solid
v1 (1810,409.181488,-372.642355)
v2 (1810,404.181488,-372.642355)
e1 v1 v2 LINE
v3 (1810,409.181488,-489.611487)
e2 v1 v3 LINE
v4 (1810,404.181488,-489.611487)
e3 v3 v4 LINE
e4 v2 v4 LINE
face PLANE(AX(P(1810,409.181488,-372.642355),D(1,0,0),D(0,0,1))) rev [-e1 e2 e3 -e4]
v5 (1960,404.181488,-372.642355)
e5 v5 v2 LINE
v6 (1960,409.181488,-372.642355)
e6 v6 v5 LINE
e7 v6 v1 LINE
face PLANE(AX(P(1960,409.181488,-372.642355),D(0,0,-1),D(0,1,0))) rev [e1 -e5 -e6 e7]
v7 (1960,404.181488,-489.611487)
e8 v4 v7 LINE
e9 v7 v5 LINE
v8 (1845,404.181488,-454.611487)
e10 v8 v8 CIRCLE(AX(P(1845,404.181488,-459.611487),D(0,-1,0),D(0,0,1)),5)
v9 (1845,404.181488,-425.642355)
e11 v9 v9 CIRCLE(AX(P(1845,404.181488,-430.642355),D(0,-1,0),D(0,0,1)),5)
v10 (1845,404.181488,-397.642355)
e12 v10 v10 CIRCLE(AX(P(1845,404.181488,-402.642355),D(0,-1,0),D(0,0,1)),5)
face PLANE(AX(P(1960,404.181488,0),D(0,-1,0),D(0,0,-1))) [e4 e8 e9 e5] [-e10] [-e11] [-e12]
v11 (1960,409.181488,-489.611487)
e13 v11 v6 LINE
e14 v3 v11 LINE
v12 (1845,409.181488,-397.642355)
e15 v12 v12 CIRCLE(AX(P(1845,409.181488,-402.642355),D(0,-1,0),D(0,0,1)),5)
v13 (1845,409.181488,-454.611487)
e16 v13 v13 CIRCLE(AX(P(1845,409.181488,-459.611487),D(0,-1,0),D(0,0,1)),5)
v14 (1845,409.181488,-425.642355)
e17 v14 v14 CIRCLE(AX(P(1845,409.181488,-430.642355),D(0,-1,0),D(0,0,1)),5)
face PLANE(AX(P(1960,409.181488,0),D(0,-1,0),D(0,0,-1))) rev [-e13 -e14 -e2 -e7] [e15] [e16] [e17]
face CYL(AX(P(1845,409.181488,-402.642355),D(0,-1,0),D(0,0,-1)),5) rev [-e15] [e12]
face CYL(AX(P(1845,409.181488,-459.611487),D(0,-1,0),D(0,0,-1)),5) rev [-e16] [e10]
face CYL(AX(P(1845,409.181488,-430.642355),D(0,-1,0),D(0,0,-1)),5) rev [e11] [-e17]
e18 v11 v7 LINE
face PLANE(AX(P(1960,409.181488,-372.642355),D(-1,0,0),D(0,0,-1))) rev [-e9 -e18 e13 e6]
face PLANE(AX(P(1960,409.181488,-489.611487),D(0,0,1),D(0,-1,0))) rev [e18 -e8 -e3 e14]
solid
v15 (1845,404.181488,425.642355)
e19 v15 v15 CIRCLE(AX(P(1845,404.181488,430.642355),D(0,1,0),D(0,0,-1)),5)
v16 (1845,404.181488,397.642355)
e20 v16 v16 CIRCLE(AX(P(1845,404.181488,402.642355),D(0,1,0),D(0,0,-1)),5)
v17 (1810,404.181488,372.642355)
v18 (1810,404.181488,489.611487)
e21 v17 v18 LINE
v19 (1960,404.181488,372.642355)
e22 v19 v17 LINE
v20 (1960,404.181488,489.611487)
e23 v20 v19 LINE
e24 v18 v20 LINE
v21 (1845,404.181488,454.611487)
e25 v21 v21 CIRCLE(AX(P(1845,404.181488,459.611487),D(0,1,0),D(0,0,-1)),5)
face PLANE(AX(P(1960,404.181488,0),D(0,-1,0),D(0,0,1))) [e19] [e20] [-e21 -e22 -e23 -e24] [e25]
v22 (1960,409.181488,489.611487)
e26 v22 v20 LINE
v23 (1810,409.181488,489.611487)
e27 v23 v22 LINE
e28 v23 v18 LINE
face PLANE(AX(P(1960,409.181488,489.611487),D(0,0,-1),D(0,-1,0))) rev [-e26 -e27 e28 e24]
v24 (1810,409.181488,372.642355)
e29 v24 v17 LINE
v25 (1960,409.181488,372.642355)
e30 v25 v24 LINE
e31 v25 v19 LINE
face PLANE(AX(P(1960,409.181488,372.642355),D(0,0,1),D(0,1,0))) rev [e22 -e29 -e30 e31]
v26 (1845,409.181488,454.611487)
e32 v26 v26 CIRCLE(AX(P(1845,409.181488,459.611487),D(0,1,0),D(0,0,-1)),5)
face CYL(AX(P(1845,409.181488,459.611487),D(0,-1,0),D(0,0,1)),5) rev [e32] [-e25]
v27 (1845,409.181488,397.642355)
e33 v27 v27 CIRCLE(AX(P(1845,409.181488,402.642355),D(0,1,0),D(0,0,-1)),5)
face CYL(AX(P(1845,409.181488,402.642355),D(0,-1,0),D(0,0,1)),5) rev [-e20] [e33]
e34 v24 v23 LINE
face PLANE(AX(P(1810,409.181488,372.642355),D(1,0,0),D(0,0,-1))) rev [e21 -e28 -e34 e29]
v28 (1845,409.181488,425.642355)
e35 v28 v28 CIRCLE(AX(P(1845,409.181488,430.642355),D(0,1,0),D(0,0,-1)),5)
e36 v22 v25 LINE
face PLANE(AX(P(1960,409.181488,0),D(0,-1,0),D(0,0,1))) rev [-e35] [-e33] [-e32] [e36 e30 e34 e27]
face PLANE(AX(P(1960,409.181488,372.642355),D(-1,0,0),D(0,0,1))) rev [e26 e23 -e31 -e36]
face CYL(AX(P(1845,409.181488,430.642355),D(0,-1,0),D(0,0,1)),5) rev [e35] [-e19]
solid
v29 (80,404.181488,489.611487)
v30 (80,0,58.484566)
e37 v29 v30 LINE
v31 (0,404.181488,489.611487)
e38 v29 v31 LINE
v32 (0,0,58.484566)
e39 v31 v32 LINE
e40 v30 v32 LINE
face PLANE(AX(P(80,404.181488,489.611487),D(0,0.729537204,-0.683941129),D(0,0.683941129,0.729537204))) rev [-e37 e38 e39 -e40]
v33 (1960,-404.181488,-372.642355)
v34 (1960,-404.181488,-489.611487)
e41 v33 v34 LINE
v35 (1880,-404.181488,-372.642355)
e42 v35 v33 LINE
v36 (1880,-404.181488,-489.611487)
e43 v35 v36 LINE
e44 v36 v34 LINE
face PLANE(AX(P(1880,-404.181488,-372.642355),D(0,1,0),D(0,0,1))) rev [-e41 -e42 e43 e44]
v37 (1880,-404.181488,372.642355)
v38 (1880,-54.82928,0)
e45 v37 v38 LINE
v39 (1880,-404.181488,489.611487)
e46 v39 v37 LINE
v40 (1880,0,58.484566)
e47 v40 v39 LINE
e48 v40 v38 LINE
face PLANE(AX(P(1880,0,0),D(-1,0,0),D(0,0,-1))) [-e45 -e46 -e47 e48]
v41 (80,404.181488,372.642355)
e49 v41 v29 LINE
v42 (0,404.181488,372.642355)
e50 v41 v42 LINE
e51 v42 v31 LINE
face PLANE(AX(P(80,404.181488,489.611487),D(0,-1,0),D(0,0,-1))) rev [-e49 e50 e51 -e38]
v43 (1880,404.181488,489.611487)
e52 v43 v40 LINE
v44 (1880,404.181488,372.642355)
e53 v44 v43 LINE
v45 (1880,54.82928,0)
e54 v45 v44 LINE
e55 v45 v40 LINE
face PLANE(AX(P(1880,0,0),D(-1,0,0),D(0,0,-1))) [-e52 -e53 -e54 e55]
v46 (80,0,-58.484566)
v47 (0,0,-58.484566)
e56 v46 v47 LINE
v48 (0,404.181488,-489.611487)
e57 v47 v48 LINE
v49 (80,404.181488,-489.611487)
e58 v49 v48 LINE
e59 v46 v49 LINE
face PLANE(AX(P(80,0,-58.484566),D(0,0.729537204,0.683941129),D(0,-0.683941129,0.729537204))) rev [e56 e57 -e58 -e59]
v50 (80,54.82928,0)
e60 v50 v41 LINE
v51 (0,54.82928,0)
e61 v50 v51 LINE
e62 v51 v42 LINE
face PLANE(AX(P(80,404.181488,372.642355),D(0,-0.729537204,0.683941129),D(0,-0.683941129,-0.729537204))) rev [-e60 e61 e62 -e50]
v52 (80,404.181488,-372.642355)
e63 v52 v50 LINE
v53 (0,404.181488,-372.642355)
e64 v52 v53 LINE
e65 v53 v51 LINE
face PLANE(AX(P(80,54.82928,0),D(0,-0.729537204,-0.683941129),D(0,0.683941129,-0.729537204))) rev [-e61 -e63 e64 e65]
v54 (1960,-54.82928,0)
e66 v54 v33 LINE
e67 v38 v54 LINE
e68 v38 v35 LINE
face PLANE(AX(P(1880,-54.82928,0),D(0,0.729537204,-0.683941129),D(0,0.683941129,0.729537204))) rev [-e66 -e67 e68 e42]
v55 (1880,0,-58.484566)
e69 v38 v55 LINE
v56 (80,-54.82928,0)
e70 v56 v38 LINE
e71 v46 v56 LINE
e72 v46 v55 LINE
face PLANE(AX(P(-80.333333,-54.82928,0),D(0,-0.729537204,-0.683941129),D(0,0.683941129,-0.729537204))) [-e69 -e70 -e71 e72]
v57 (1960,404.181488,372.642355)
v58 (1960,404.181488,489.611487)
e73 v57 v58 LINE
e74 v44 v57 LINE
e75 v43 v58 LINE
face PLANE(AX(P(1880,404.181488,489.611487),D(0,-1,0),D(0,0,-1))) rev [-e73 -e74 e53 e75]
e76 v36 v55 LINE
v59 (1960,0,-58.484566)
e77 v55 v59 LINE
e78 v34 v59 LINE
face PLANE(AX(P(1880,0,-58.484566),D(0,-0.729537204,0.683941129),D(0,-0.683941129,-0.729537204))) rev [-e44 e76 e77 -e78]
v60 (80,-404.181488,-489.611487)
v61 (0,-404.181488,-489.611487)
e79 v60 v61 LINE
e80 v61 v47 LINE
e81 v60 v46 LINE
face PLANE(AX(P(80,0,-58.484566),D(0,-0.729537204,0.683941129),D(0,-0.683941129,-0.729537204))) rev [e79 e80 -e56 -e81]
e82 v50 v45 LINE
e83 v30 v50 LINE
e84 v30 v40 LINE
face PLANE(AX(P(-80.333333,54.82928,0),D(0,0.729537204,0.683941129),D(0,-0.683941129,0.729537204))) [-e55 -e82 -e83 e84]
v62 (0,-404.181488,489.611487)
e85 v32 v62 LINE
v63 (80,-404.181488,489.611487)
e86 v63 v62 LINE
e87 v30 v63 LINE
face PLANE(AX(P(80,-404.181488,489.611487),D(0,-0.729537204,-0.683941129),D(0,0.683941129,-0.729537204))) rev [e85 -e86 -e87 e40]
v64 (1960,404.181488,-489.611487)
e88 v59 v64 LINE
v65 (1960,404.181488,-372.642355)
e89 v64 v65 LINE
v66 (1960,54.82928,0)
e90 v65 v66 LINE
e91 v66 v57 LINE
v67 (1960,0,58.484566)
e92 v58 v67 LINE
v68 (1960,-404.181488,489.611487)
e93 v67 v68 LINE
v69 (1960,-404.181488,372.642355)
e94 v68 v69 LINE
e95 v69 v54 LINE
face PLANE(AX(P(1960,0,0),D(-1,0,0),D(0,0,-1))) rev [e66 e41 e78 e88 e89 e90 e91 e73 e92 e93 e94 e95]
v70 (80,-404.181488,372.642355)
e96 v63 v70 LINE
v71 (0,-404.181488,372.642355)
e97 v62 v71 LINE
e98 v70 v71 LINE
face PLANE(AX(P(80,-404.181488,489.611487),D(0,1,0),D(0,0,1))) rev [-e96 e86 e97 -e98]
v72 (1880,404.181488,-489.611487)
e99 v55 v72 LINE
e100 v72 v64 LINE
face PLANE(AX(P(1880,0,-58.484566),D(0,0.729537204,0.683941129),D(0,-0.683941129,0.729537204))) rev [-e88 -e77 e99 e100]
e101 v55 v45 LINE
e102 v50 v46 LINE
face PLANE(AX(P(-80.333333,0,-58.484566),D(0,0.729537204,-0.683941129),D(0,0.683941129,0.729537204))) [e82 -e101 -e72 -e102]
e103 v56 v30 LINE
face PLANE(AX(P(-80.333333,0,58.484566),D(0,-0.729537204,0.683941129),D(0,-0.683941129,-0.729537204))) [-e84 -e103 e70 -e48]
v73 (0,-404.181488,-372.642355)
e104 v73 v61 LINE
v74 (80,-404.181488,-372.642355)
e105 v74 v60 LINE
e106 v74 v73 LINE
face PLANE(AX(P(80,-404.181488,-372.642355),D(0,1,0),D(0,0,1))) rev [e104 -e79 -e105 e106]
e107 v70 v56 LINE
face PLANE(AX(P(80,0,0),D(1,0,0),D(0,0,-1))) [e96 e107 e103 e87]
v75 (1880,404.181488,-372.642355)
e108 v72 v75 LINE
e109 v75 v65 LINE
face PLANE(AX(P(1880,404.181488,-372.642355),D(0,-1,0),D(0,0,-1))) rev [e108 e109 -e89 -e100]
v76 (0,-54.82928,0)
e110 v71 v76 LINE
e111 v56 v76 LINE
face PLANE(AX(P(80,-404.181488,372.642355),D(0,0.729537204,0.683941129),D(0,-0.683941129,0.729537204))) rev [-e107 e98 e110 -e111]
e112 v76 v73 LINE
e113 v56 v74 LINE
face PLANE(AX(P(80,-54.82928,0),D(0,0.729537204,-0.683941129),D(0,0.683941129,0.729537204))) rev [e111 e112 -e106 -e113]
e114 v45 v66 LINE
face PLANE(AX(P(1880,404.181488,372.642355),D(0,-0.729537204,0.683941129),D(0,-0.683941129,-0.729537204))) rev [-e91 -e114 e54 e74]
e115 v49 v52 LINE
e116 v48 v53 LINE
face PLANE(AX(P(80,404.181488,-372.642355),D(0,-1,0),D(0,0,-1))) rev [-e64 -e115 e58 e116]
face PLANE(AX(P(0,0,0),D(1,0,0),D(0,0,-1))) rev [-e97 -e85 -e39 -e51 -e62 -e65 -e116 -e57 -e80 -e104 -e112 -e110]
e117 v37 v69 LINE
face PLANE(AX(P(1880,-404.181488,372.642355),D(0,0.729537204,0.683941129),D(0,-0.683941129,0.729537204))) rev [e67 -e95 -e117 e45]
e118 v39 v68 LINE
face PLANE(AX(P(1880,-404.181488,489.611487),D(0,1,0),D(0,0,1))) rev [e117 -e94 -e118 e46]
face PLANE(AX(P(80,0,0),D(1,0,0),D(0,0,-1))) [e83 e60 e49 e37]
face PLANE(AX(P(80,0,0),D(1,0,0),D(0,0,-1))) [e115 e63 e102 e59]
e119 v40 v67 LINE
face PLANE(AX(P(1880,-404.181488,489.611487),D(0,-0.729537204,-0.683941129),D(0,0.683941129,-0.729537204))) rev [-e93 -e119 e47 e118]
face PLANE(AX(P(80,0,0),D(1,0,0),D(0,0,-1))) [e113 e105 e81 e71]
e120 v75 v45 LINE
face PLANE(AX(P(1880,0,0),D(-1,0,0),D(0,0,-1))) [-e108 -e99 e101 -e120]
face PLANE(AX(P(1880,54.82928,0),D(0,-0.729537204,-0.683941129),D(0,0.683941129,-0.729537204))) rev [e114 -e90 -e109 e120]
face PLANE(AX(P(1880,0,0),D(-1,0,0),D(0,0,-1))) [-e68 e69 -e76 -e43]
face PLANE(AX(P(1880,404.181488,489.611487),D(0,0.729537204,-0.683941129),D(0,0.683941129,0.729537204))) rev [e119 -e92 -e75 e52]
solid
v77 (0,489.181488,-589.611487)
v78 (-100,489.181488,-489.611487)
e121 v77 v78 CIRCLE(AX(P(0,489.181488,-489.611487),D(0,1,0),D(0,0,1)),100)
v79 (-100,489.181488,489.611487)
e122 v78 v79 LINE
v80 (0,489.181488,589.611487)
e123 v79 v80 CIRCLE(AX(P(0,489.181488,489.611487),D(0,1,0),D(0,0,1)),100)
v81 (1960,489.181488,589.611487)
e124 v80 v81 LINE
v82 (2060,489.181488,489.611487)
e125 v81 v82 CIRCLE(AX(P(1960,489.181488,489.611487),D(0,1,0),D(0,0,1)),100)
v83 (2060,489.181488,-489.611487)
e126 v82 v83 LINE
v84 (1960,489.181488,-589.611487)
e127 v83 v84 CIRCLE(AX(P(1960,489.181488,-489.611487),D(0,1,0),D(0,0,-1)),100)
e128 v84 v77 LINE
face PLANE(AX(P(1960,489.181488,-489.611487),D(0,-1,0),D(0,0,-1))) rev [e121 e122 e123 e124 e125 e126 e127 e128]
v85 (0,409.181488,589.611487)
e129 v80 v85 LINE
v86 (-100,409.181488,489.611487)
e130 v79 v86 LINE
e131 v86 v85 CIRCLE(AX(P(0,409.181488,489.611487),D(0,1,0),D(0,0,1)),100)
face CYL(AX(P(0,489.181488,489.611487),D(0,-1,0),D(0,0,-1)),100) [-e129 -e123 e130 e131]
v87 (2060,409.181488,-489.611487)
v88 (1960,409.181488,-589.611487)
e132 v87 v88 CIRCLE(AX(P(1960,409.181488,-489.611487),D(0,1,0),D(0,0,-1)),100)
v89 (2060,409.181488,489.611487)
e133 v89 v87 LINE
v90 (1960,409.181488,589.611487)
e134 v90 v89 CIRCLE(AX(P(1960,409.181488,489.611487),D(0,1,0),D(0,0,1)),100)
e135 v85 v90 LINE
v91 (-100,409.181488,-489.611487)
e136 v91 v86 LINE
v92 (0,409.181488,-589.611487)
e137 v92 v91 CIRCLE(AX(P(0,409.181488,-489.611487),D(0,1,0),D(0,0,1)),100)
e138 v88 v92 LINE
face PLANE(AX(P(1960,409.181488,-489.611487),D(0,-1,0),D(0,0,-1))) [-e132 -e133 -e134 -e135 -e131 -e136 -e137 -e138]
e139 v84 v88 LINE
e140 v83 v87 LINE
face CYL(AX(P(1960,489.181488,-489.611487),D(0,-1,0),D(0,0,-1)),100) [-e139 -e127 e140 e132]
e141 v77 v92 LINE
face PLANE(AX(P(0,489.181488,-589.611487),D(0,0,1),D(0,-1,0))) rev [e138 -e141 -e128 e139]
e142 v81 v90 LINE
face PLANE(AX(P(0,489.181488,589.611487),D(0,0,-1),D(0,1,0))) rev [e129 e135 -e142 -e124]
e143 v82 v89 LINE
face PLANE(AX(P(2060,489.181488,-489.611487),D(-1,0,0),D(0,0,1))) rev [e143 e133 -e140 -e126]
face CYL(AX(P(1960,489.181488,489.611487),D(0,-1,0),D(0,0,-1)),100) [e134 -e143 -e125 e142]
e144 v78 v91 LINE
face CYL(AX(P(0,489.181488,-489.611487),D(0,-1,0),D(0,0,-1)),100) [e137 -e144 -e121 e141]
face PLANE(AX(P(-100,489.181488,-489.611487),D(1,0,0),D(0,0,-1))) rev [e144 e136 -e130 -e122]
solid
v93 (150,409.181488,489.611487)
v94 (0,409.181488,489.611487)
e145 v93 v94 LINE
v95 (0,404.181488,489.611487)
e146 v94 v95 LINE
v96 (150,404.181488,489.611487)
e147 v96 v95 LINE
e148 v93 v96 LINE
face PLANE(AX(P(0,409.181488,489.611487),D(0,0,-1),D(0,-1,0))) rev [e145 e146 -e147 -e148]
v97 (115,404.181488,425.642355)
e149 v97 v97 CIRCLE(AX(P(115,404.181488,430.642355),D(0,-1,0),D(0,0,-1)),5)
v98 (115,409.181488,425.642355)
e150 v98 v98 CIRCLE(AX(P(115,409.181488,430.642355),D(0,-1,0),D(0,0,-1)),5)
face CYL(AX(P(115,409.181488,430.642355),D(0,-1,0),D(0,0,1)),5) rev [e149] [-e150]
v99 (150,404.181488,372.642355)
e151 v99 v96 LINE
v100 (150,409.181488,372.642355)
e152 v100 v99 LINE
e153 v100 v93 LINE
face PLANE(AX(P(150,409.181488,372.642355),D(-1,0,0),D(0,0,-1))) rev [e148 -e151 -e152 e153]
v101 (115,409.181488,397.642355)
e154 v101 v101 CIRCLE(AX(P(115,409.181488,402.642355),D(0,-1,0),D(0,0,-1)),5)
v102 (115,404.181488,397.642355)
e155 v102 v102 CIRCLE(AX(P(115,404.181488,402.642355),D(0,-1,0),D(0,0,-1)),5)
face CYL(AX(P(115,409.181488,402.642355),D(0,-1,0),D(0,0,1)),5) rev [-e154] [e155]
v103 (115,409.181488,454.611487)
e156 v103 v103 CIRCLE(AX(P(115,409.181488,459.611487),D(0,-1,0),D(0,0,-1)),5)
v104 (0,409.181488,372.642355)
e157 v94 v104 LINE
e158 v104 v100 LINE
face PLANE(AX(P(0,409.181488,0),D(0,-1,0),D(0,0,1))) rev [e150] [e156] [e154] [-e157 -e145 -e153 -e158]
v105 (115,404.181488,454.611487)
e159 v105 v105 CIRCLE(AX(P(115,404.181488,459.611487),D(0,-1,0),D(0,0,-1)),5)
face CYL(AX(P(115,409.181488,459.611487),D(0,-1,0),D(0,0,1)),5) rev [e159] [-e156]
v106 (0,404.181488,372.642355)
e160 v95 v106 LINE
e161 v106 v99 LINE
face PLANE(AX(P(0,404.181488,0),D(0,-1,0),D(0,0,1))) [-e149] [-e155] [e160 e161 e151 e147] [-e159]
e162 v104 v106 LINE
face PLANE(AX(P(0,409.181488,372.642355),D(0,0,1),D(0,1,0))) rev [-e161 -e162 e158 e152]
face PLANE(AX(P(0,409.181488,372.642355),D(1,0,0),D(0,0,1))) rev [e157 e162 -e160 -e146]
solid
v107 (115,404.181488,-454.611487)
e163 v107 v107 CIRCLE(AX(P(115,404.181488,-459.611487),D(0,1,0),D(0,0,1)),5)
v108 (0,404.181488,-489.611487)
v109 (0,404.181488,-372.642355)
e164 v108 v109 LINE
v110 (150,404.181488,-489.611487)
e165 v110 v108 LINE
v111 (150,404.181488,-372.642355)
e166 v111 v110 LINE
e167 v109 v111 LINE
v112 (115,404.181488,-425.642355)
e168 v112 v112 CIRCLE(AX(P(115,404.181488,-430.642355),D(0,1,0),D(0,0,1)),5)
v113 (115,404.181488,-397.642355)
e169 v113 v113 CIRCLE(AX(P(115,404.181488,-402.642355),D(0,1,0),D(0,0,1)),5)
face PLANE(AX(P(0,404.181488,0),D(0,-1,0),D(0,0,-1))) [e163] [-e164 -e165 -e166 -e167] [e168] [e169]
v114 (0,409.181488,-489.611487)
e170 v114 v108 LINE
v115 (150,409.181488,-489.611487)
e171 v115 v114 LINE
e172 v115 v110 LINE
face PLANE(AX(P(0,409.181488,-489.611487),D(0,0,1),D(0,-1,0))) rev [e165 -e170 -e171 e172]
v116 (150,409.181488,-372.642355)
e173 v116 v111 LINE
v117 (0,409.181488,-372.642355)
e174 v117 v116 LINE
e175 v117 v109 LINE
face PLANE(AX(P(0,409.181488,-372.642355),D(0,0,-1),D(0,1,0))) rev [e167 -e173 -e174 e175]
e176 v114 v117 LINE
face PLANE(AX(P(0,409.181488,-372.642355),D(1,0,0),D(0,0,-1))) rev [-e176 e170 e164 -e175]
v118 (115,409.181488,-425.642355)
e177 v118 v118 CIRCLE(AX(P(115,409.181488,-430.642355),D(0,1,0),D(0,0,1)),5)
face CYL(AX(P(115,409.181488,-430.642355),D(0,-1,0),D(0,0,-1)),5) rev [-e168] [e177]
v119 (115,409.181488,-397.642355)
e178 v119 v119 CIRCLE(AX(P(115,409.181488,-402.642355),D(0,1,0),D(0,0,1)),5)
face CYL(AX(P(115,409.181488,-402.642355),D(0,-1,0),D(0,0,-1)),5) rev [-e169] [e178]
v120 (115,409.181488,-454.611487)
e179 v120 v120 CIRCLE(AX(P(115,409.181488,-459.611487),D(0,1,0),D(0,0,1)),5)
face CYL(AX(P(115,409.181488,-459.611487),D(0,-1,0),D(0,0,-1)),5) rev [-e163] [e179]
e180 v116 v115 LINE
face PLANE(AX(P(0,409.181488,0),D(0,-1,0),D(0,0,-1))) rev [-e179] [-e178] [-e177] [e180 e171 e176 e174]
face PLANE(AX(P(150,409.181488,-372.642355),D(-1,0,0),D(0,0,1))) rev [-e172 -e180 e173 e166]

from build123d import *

# Parameters (mm, degrees)
BOSS_EXTRUDE1_DEPTH = 80
SKETCH2_W           = 150
SKETCH2_H           = 116.96913173
SKETCH2_R           = 5
BASE_FLANGE1_DEPTH  = 5
BOSS_EXTRUDE2_START = -80
BOSS_EXTRUDE2_DEPTH = 1800
BOSS_EXTRUDE3_DEPTH = 80


# Sheet-metal steps are written as plain solids
with BuildPart() as part:
    # Sketch1 → Boss-Extrude1 (new body)
    with BuildSketch(Plane(origin=(0, 0, 0), x_dir=(0, 0, -1), z_dir=(1, 0, 0))):
        Polygon((-372.642354845, -404.181488166), (0, -54.829280499), (372.642354845, -404.181488166), (489.611486575, -404.181488166), (58.484565865, 0), (489.611486575, 404.181488166), (372.642354845, 404.181488166), (0, 54.829280499), (-372.642354845, 404.181488166), (-489.611486575, 404.181488166), (-58.484565865, 0), (-489.611486575, -404.181488166), align=None)
    extrude(amount=BOSS_EXTRUDE1_DEPTH)


with BuildPart() as body_2:
    # Mirror2: mirrored copy
    add(part.part.mirror(Plane(origin=(980, 0, 0), x_dir=(0, 0, 1), z_dir=(1, 0, 0))))


with BuildPart() as body_3:
    # Sketch2 → Base-Flange1 (new body)
    with BuildSketch(Plane(origin=(0, 404.181488166, 0), x_dir=(1, 0, 0), z_dir=(0, 1, 0))):
        with Locations((75, 431.12692071)):
            Rectangle(SKETCH2_W, SKETCH2_H)
        with Locations(Location((115, 459.611486575, 0), (0, 0, 270))):
            Circle(SKETCH2_R, mode=Mode.SUBTRACT)
        with Locations(Location((115, 430.642354845, 0), (0, 0, 270))):
            Circle(SKETCH2_R, mode=Mode.SUBTRACT)
        with Locations(Location((115, 402.642354845, 0), (0, 0, 270))):
            Circle(SKETCH2_R, mode=Mode.SUBTRACT)
    extrude(amount=BASE_FLANGE1_DEPTH)


with BuildPart() as body_4:
    # Mirror3: mirrored copy
    add(body_3.part.mirror(Plane(origin=(980, 0, 0), x_dir=(0, 0, 1), z_dir=(1, 0, 0))))


with BuildPart() as body_5:
    # Mirror4: mirrored copy
    add(body_4.part.mirror(Plane.XY))


with BuildPart() as body_6:
    # Mirror4 2: mirrored copy
    add(body_3.part.mirror(Plane.XY))


with BuildPart() as part_1:
    add(part.part)

    add(body_2.part)  # Boss-Extrude2 merges body 2
    # Sketch13 → Boss-Extrude2 (add)
    with BuildSketch(Plane(origin=(1960, 0, 0), x_dir=(0, 0, -1), z_dir=(1, 0, 0)).offset(BOSS_EXTRUDE2_START)):
        Polygon((0, 54.829280499), (-58.484565865, 0), (0, -54.829280499), (58.484565865, 0), align=None)
    extrude(amount=-BOSS_EXTRUDE2_DEPTH)


with BuildPart() as body_6_2:
    # Sketch14 → Boss-Extrude3 (new body)
    with BuildSketch(Plane(origin=(0, 409.181488166, 0), x_dir=(1, 0, 0), z_dir=(0, 1, 0))):
        with BuildLine():
            Line((0, 589.611486575), (1960, 589.611486575))
            ThreePointArc((1960, 589.611486575), (2030.710678119, 560.322164694), (2060, 489.611486575))
            Line((2060, 489.611486575), (2060, -489.611486575))
            ThreePointArc((2060, -489.611486575), (2030.710678119, -560.322164694), (1960, -589.611486575))
            Line((1960, -589.611486575), (0, -589.611486575))
            ThreePointArc((0, -589.611486575), (-70.710678119, -560.322164694), (-100, -489.611486575))
            Line((-100, -489.611486575), (-100, 489.611486575))
            ThreePointArc((-100, 489.611486575), (-70.710678119, 560.322164694), (0, 589.611486575))
        make_face()
    extrude(amount=BOSS_EXTRUDE3_DEPTH)


solid = Compound([body_3.part, body_4.part, body_5.part, body_6.part, part_1.part, body_6_2.part])
